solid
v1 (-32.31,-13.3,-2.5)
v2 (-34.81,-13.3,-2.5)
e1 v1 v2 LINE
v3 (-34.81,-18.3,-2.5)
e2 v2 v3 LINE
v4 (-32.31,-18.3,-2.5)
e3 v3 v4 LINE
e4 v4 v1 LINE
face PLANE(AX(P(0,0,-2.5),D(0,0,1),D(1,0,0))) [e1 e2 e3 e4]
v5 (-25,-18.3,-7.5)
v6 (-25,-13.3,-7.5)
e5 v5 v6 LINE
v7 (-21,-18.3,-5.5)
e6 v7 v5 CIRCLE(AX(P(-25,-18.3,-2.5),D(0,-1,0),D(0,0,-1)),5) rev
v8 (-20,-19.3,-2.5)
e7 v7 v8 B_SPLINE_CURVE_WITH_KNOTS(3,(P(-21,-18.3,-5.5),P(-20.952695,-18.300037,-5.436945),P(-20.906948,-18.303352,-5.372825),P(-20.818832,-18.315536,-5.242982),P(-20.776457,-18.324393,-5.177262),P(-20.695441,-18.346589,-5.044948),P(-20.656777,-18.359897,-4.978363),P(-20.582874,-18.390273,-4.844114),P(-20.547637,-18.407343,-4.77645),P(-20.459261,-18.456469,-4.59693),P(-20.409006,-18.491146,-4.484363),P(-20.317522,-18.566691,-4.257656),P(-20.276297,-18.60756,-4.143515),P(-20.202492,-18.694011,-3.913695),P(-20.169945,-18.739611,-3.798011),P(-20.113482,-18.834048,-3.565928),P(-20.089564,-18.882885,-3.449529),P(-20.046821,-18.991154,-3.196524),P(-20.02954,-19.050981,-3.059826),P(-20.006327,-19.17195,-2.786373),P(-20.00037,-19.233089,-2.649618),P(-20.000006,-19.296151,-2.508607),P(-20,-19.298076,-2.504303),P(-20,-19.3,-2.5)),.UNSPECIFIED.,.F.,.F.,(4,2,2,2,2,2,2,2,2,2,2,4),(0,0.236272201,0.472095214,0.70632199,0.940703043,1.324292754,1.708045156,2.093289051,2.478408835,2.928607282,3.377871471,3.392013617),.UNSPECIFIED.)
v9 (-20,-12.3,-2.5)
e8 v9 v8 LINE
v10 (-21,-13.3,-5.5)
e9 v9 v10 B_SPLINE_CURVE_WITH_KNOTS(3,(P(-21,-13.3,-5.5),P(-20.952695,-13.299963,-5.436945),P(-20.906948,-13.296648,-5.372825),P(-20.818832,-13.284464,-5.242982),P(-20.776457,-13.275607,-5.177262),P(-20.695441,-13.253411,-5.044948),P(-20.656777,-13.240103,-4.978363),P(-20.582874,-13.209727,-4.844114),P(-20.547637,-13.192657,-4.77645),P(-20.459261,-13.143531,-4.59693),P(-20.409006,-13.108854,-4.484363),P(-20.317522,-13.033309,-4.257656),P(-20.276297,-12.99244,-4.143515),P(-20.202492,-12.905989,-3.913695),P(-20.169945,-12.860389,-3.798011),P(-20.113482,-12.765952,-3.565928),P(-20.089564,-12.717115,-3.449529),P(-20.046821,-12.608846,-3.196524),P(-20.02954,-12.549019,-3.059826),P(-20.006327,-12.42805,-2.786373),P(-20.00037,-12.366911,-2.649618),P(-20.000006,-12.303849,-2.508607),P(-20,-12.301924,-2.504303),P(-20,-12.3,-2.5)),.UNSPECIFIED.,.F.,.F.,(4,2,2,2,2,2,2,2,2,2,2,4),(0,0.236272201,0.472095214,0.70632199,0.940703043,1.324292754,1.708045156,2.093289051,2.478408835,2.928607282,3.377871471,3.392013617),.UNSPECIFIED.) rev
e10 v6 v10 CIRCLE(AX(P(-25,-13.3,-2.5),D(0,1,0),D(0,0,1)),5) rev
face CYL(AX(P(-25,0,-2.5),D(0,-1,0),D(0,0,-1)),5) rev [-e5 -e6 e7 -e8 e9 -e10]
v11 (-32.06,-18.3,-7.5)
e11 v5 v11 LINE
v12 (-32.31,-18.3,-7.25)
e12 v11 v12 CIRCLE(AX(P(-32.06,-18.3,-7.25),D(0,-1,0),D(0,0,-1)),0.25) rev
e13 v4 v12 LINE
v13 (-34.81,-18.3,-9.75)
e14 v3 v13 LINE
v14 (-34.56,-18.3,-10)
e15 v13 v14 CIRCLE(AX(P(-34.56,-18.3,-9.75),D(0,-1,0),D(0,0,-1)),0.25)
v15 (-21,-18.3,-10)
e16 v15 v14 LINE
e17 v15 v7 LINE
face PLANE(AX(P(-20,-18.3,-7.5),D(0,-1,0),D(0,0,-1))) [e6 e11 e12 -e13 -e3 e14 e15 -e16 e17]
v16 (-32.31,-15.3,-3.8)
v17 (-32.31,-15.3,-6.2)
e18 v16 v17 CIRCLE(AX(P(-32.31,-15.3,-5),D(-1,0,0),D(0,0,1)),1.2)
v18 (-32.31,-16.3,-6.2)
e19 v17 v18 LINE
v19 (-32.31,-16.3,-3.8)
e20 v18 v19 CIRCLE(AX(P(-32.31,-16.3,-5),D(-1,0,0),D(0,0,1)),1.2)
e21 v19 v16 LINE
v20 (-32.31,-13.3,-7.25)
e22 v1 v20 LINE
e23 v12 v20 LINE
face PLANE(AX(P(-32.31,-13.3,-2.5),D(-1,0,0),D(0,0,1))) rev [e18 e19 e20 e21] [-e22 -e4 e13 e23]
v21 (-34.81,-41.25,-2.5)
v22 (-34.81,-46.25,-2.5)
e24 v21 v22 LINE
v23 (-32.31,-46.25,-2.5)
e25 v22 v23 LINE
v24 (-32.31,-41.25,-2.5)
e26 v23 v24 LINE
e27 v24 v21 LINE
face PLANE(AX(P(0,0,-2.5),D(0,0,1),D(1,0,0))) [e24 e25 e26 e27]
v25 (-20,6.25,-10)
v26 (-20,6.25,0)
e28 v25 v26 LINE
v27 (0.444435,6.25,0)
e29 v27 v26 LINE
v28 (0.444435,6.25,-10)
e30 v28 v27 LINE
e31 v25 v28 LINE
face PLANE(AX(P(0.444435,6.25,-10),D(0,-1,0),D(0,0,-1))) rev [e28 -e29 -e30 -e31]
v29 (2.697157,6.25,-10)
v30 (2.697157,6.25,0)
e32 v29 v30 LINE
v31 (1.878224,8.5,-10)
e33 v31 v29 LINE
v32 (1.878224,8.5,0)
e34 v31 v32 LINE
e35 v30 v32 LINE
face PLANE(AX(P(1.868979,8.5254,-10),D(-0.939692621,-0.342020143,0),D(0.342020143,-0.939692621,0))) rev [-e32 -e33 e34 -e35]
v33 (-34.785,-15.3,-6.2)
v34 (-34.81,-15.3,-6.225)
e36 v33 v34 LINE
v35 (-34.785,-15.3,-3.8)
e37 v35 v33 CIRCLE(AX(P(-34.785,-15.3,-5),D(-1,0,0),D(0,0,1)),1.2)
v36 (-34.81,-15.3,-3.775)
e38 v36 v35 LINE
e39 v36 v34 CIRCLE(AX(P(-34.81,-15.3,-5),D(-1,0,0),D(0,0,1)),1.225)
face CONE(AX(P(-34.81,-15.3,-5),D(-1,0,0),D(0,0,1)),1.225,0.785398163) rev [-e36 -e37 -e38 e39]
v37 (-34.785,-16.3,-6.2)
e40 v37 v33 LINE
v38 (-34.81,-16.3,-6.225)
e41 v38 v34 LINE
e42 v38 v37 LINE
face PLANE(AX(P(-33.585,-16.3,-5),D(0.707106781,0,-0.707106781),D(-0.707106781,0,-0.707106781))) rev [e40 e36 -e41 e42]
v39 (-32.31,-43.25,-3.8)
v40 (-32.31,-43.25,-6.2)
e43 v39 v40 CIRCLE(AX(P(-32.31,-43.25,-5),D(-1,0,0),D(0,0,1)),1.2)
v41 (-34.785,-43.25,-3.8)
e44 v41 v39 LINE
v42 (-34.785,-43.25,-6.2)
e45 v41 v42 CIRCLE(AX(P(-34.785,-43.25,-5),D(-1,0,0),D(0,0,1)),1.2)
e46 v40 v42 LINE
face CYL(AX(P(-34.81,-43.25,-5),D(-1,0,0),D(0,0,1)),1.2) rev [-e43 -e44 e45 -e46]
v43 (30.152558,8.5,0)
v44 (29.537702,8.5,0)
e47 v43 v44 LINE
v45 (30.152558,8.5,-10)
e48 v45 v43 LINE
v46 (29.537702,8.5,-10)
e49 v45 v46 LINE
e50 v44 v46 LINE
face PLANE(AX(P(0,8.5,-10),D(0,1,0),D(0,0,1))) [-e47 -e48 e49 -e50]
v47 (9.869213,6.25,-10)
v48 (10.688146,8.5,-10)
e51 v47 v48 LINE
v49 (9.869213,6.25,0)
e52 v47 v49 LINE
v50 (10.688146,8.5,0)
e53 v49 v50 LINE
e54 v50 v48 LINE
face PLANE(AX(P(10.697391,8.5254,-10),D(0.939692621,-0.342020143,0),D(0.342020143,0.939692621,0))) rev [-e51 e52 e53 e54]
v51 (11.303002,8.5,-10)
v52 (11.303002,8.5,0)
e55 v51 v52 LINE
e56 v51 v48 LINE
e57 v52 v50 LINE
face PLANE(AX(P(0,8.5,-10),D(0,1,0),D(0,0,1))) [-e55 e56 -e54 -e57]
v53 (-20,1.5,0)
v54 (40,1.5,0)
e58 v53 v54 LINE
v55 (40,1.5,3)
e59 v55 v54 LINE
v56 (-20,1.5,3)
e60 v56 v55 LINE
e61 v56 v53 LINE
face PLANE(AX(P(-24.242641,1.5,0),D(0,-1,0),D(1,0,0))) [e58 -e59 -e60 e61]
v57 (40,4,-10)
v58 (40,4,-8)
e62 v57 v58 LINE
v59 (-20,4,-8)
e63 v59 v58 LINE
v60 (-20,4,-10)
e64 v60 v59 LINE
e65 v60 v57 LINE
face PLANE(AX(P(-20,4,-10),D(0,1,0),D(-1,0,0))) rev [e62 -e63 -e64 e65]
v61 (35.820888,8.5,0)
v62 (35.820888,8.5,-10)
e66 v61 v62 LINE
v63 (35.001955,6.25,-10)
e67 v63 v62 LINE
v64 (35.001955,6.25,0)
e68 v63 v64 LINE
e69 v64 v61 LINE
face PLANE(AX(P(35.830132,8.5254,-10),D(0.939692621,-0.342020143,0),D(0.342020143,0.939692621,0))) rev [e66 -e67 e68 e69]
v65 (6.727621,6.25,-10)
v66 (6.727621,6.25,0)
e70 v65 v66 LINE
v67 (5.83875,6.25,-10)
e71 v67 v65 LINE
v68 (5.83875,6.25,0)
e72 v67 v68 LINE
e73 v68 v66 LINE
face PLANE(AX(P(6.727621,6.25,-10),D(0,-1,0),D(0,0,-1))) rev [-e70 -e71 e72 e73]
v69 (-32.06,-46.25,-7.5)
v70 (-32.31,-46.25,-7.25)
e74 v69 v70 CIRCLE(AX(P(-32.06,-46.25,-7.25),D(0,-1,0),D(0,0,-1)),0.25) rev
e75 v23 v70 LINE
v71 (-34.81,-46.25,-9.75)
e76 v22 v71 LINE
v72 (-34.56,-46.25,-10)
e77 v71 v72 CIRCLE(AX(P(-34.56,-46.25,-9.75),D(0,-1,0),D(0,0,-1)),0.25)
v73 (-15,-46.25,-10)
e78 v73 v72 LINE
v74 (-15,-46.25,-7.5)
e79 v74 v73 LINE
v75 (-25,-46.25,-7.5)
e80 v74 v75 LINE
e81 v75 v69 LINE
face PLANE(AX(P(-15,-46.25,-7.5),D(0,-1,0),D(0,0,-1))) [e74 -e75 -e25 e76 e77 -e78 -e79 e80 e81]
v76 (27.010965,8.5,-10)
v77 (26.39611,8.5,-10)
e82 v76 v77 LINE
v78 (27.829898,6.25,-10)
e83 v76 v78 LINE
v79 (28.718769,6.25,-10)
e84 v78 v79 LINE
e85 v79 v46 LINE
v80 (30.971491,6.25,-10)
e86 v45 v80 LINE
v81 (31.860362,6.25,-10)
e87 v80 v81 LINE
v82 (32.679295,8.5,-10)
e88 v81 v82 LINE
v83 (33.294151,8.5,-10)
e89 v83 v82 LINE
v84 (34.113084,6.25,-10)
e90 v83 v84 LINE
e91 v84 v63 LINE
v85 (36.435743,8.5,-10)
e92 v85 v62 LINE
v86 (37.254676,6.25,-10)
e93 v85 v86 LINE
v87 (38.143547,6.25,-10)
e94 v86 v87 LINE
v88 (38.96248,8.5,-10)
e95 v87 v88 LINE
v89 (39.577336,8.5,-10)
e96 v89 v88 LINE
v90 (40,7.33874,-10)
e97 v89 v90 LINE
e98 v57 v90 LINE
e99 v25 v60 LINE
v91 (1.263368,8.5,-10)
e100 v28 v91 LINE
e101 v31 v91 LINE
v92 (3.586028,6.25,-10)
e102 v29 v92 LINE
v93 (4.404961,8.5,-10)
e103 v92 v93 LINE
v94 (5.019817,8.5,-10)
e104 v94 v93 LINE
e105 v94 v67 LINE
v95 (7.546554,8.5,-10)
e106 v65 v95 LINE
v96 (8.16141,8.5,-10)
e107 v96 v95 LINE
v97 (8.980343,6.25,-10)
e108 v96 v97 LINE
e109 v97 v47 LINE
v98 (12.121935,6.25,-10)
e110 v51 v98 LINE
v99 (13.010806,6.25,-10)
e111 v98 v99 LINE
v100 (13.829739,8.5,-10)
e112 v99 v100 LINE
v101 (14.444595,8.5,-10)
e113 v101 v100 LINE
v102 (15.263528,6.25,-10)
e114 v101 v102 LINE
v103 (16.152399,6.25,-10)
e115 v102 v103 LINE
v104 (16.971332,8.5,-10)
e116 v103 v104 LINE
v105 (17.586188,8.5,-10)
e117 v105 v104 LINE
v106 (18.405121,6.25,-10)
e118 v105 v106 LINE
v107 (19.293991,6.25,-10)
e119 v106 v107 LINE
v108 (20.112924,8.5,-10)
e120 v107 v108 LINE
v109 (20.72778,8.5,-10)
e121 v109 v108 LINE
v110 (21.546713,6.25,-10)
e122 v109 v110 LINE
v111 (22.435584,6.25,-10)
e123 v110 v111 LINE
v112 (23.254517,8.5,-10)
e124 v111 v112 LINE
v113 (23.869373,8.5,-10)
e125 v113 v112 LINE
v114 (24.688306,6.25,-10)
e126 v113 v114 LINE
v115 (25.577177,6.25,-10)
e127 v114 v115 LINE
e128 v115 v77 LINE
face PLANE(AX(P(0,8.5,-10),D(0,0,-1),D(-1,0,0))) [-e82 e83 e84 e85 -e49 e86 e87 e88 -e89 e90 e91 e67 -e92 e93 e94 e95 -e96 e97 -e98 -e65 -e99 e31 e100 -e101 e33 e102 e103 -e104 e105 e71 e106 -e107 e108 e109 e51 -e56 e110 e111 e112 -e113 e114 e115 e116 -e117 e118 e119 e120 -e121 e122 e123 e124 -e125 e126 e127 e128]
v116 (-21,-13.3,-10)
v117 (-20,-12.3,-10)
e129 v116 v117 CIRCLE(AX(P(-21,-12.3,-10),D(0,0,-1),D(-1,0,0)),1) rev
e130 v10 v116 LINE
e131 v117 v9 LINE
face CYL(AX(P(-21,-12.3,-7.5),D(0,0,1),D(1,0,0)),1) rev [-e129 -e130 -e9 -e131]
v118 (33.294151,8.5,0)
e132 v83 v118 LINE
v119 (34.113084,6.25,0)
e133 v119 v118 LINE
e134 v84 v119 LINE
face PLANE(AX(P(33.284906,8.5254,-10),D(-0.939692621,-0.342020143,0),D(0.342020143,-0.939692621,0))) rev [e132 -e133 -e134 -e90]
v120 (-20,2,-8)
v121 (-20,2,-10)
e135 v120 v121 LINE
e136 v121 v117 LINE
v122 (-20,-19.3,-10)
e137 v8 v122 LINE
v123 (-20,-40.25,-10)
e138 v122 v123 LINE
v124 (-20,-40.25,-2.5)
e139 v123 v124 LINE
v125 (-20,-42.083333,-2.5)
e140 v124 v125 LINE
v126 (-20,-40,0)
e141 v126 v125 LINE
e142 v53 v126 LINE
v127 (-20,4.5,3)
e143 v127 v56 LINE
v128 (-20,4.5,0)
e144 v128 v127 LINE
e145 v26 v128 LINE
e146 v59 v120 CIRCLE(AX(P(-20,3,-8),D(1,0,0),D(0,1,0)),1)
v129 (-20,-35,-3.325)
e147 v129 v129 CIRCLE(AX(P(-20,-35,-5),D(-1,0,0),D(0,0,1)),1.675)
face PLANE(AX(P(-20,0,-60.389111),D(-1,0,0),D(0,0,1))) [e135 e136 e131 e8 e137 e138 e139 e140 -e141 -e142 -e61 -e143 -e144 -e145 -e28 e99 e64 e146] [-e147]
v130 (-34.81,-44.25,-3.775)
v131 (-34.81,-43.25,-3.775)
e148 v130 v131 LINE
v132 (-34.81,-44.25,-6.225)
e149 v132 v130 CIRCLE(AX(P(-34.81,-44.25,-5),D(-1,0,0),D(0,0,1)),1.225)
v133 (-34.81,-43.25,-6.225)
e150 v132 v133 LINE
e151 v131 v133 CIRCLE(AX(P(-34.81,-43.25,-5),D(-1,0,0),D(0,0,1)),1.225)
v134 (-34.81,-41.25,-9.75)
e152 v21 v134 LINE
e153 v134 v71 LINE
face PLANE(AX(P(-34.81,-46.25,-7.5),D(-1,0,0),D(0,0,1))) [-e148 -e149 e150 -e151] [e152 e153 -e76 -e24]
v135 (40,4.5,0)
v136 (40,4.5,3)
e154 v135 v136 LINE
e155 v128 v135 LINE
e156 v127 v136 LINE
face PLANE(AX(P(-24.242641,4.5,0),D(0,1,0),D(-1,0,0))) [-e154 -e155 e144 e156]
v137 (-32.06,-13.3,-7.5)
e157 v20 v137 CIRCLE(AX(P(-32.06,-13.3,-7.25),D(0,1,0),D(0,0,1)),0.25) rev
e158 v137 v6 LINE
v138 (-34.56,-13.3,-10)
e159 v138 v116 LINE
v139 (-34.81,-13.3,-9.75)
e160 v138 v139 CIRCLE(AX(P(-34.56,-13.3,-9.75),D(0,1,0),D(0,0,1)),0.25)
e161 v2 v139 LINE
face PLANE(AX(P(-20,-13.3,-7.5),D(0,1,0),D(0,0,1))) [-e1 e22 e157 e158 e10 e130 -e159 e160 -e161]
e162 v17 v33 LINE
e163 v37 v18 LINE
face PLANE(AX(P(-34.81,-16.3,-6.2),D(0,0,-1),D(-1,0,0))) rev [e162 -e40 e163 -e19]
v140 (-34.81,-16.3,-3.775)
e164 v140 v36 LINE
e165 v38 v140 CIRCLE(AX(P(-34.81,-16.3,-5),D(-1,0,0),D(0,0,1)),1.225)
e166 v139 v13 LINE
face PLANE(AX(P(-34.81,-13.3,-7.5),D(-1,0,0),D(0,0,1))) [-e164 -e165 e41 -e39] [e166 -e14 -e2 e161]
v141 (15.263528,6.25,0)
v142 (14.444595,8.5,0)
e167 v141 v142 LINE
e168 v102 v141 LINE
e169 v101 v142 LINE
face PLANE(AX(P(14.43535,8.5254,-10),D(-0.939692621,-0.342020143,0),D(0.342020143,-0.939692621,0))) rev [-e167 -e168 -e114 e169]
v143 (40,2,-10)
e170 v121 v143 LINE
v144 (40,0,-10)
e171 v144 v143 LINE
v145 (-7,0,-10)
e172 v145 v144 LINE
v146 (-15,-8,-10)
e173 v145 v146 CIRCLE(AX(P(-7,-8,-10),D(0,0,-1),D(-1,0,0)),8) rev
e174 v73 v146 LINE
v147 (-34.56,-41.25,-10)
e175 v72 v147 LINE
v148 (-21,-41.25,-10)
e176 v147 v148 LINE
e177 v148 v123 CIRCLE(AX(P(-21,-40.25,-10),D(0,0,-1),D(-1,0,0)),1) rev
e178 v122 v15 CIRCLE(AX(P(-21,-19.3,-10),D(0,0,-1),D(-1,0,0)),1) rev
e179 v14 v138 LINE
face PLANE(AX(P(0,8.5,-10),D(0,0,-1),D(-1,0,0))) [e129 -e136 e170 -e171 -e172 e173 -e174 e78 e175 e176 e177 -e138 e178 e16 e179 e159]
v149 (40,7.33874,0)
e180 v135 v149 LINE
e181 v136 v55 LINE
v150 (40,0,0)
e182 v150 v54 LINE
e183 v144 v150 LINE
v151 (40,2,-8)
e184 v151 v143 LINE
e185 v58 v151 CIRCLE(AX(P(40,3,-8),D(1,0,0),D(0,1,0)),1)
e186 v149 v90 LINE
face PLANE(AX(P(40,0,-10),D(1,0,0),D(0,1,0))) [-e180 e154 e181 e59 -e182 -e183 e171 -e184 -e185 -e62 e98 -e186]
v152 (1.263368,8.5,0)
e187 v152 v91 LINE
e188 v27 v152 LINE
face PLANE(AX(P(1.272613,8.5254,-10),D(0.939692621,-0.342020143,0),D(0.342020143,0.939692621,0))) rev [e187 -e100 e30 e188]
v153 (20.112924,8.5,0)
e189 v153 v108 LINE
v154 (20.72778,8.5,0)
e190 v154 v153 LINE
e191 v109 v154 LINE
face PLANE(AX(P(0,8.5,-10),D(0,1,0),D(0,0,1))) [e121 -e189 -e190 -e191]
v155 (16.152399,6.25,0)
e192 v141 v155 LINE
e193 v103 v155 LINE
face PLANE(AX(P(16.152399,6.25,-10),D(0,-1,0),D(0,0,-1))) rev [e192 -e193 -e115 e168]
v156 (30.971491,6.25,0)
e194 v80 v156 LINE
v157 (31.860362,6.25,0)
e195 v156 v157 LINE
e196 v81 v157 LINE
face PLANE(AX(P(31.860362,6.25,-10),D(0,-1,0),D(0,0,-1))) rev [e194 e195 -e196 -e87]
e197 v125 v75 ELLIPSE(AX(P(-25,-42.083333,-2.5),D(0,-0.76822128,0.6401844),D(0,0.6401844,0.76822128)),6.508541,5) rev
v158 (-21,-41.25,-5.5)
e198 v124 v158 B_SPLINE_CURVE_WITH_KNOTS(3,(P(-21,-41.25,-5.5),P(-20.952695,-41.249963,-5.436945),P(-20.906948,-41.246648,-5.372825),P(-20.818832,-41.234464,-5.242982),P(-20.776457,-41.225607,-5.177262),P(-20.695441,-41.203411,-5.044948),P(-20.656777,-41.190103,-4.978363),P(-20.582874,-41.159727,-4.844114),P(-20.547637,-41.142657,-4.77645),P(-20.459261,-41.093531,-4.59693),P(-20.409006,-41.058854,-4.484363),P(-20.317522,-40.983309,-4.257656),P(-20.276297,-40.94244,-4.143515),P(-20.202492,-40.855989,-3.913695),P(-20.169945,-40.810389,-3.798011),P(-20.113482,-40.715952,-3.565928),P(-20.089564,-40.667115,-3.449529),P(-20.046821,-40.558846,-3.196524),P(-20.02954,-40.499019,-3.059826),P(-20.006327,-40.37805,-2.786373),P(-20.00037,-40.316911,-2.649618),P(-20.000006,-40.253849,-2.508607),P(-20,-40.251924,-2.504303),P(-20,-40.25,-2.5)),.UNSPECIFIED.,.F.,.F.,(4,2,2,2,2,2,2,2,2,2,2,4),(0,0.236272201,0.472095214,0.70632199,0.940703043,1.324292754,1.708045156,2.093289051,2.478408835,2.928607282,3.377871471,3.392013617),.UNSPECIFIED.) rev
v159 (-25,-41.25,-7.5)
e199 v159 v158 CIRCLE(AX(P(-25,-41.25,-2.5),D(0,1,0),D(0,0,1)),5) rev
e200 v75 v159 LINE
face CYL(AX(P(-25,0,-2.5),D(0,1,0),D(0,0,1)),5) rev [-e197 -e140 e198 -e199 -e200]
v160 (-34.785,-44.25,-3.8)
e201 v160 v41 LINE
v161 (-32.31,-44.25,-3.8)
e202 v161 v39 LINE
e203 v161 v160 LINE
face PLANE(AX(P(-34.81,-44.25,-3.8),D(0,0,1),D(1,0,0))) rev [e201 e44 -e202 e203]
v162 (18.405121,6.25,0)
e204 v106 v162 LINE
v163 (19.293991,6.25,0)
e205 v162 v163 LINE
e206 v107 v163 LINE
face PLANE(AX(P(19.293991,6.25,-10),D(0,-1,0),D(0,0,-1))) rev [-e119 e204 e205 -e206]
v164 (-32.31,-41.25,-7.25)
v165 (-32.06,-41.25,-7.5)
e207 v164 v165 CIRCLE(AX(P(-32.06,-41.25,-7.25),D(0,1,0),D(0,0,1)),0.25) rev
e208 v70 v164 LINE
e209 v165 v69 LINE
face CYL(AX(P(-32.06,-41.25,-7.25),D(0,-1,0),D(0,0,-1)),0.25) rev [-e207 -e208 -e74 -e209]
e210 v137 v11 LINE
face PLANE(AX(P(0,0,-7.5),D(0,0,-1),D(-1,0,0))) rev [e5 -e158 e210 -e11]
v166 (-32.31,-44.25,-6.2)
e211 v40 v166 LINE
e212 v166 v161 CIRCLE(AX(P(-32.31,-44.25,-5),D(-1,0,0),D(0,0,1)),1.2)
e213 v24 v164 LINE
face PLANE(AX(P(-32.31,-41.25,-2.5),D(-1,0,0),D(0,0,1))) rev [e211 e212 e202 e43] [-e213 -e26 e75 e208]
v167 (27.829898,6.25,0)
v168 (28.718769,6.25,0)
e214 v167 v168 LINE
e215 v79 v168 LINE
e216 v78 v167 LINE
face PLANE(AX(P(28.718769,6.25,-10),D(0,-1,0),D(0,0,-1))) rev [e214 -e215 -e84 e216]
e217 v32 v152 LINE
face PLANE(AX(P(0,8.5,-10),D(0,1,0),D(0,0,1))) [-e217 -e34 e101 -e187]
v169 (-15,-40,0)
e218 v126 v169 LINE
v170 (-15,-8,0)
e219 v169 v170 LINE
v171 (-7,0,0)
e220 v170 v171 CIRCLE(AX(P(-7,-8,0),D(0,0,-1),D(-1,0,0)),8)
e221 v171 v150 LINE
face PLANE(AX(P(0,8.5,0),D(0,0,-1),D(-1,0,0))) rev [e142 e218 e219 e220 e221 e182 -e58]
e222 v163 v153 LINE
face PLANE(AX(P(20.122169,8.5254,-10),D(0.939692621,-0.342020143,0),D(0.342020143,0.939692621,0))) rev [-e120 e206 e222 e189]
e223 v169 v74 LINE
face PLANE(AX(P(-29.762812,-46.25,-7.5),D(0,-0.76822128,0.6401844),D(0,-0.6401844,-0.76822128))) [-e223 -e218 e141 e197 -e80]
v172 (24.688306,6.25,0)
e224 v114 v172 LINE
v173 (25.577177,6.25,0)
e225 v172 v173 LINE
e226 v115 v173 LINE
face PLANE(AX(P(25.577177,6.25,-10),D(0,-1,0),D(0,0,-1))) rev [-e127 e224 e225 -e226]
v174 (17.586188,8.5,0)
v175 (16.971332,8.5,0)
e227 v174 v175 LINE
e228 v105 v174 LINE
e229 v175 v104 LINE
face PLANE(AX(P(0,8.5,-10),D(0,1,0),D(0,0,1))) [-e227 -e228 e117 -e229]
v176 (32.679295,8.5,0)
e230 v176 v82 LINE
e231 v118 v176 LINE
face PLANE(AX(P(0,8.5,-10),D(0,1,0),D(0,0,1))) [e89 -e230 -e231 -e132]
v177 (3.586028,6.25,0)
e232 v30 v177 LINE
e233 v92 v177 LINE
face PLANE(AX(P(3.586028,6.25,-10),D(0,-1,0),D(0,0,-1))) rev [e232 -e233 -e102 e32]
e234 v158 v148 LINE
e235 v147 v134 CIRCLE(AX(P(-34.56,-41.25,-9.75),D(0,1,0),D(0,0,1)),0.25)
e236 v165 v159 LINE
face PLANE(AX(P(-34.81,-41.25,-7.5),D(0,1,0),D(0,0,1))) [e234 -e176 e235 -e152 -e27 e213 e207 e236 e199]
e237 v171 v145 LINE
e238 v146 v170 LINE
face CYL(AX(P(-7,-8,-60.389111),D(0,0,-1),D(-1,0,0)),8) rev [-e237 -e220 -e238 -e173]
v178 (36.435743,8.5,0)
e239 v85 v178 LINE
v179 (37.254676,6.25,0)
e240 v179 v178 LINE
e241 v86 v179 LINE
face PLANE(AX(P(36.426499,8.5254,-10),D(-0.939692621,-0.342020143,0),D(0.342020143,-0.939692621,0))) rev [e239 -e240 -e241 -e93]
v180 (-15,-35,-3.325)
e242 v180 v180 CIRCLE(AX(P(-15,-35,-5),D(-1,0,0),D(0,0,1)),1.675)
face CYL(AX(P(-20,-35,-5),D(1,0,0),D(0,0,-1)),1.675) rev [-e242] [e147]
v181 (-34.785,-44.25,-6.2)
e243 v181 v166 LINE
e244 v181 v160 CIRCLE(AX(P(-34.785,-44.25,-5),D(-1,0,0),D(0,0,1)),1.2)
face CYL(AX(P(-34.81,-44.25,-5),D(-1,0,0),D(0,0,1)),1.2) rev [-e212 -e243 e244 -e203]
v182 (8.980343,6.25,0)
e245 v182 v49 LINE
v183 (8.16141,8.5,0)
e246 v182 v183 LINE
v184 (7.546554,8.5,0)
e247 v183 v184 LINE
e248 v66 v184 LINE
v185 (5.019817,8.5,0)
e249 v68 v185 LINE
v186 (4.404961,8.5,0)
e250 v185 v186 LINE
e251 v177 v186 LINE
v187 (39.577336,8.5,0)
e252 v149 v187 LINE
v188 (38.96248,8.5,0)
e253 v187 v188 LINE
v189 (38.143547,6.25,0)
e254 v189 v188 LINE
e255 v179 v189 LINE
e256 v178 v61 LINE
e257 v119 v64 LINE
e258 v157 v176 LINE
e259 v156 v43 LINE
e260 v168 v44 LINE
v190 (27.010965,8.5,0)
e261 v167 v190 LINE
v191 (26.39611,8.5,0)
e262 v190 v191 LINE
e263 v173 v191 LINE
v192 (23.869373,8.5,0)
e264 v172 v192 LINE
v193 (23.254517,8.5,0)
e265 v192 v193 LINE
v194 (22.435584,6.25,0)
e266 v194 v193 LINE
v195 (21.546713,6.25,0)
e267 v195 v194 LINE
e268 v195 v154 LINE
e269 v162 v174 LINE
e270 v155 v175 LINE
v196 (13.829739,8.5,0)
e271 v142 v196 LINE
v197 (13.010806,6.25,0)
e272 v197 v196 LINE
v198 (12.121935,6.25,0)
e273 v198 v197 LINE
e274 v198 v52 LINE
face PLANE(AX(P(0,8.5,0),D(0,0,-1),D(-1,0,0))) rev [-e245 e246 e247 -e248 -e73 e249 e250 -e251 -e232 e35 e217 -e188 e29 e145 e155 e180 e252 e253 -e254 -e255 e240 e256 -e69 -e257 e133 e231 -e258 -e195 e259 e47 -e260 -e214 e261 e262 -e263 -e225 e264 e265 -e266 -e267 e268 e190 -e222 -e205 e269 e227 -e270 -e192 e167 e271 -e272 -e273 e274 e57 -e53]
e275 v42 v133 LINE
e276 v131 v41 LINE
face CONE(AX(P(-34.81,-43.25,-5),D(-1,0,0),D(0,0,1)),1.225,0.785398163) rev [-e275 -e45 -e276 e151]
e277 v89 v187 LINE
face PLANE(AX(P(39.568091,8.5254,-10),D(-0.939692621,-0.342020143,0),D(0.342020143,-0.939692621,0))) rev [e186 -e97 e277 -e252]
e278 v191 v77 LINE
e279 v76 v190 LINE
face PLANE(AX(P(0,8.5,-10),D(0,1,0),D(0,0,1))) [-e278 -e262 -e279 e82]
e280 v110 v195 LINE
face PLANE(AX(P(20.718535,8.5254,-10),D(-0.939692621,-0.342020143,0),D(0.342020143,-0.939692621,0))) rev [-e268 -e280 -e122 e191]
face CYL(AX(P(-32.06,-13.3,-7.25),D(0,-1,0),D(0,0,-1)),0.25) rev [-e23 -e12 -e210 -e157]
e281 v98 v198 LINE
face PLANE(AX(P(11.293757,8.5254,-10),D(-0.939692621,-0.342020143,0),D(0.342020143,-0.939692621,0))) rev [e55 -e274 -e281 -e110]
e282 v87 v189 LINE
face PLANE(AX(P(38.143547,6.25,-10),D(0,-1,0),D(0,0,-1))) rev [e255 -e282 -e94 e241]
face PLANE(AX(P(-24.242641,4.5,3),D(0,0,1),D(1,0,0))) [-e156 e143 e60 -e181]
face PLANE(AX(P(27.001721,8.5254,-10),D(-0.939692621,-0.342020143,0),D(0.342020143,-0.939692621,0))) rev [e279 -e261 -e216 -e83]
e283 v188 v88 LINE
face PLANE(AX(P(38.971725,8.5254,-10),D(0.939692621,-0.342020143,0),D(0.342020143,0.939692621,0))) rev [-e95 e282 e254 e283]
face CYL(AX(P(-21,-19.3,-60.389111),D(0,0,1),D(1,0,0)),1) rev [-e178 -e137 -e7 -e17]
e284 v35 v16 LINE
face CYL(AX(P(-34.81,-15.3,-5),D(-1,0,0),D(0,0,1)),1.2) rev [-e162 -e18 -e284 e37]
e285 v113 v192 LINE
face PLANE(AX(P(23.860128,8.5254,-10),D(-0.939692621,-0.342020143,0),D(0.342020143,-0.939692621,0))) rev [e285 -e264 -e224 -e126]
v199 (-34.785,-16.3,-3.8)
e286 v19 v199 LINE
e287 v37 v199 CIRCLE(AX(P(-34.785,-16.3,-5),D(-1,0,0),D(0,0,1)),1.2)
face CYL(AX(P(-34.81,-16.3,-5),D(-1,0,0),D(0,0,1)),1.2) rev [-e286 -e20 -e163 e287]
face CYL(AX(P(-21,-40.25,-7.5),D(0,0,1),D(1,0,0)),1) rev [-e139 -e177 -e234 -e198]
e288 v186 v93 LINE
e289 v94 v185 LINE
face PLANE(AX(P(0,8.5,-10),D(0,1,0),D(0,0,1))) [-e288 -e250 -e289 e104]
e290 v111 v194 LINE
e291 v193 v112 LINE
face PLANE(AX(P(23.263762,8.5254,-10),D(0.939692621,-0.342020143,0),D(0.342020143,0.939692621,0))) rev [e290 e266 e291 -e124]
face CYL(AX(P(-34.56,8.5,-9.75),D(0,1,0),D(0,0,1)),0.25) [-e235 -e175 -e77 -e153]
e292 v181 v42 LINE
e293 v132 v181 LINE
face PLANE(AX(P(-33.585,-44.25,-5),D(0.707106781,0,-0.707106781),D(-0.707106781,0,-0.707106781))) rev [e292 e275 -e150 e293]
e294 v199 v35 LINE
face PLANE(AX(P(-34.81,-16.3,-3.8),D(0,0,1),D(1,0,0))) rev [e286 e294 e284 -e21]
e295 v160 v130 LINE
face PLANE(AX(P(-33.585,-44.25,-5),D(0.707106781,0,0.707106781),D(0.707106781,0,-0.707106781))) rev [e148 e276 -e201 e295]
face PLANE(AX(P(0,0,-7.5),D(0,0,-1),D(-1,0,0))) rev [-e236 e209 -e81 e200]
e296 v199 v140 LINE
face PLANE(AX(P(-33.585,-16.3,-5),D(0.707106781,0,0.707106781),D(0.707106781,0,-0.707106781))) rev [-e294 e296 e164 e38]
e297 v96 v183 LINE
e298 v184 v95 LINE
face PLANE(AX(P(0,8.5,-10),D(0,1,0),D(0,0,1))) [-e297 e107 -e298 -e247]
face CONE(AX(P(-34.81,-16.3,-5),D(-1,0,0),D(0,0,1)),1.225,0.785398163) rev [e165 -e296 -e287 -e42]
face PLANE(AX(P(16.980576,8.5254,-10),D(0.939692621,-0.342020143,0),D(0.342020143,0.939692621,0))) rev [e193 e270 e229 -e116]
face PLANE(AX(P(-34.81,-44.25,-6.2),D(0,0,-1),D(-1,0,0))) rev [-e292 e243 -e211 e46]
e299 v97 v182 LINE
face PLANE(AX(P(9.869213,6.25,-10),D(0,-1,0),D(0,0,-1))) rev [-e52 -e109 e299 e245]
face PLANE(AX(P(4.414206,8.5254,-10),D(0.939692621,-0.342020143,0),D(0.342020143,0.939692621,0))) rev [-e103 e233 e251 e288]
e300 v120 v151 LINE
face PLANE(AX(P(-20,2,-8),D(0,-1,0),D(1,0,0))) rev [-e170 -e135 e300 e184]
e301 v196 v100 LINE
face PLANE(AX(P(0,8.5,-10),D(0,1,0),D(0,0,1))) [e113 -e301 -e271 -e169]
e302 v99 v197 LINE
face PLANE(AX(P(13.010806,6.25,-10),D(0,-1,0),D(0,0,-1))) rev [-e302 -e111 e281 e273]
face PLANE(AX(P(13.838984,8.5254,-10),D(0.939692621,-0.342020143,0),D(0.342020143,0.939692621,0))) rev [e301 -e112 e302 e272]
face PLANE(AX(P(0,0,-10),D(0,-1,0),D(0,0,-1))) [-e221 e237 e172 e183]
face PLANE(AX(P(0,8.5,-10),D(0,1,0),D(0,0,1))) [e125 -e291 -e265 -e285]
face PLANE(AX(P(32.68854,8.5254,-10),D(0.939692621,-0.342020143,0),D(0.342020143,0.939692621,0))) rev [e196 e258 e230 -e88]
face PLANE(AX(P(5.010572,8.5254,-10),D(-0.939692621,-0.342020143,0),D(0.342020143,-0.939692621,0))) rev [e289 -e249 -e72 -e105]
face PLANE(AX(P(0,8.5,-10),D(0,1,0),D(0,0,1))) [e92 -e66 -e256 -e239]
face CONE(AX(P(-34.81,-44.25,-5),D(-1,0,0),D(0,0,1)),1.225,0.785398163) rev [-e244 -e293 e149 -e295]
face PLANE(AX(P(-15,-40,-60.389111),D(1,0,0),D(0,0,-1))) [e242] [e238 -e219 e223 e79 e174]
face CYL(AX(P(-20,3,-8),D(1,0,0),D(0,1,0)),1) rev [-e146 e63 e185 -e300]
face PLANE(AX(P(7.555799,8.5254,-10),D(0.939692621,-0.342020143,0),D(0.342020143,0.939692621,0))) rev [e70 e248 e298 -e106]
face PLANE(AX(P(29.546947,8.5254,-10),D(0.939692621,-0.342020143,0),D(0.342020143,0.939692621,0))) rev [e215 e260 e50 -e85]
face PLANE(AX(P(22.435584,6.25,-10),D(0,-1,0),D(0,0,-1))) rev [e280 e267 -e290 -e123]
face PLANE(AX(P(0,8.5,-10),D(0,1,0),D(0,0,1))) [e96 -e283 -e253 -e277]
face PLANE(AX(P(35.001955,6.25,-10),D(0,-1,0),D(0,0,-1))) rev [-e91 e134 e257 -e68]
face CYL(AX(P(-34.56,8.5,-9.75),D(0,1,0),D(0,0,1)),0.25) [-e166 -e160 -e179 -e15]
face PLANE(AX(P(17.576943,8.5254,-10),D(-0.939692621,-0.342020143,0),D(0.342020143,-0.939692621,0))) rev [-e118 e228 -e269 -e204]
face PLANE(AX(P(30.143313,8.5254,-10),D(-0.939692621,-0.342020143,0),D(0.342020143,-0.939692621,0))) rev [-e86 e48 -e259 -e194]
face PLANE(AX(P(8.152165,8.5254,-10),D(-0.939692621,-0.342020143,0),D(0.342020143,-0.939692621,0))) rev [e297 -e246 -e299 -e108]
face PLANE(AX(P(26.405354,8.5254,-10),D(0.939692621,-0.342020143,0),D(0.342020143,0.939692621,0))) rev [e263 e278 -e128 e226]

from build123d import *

# Parameters (mm, degrees)
BLANKSKE_W               = 40
BLANKSKE_H               = 8.5
BLANK_DEPTH              = 10
TOOTHCUTSIM_DEPTH        = 43.09809972
TEETHCUTS_COUNT          = 14
TEETHCUTS_PITCH          = 3.14159265
BOSS_EXTRUDE1_DEPTH      = 10
SKETCH2_W                = 3
SKETCH2_H                = 3
BOSS_EXTRUDE2_DEPTH      = 60
CUT_EXTRUDE2_DEPTH       = 73.801098893
MOVE_FACE2_BY            = 5
FILLET2_R                = 8
SKETCH3_R                = 1.675
CUT_EXTRUDE1_DEPTH       = 69.738635424
SKETCH6_W                = 14.81
SKETCH6_H                = 5
BOSS_EXTRUDE3_DEPTH      = 2.5
SKETCH7_W                = 2.5
SKETCH7_H                = 5
BOSS_EXTRUDE4_DEPTH      = 5
M2_START                 = -34.81
M2_CLEARANCE_SLOT1_DEPTH = 2.5
BOSS_EXTRUDE5_DEPTH      = 5
FILLET3_R                = 5
FILLET4_R                = 1
FILLET5_R                = 0.25


with BuildPart() as part:
    # BlankSke → Blank (new body)
    with BuildSketch(Plane.XY):
        with Locations((20, 4.25)):
            Rectangle(BLANKSKE_W, BLANKSKE_H)
    extrude(amount=-BLANK_DEPTH)

    # TooCutSkeSim → ToothCutSim (cut, through all)
    with BuildSketch(Plane.XY):
        Polygon((0.44443537, 6.25), (-0.44443537, 6.25), (-1.272613241, 8.5254), (1.272613241, 8.5254), align=None)
    toothcutsim = extrude(amount=-TOOTHCUTSIM_DEPTH, mode=Mode.SUBTRACT)

    # TeethCuts: ToothCutSim ×14
    with Locations(*[(i * TEETHCUTS_PITCH, 0, 0) for i in range(1, TEETHCUTS_COUNT)]):
        add(toothcutsim, mode=Mode.SUBTRACT)

    # Sketch1 → Boss-Extrude1 (add)
    with BuildSketch(Plane.XY):
        Polygon((-20, 0), (-20, -40), (-10, -40), (-10, 0), (0, 0), (0, 6.25), (-20, 6.25), align=None)
    extrude(amount=-BOSS_EXTRUDE1_DEPTH)

    # Sketch2 → Boss-Extrude2 (add)
    with BuildSketch(Plane(origin=(40, 0, 0), x_dir=(0, 0, -1), z_dir=(1, 0, 0))):
        with Locations((-1.5, 3)):
            Rectangle(SKETCH2_W, SKETCH2_H)
    extrude(amount=-BOSS_EXTRUDE2_DEPTH)

    # Sketch5 → Cut-Extrude2 (cut, through all)
    with BuildSketch(Plane(origin=(40, 0, 0), x_dir=(0, 0, -1), z_dir=(1, 0, 0))):
        with BuildLine():
            Line((10, 2), (10, 4))
            Line((10, 4), (8, 4))
            ThreePointArc((8, 4), (7, 3), (8, 2))
            Line((8, 2), (10, 2))
        make_face()
    extrude(amount=-CUT_EXTRUDE2_DEPTH, mode=Mode.SUBTRACT)

    # Move Face2: a face moved inward by 5.0
    extrude(part.faces().sort_by_distance((-10, -20, -5))[0], amount=MOVE_FACE2_BY, dir=(-1, 0, 0), mode=Mode.SUBTRACT)

    # Fillet2
    fillet2_edges = [part.edges().sort_by_distance(p)[0] for p in [
        (-15, 0, -5),
    ]]
    fillet(fillet2_edges, radius=FILLET2_R)

    # Sketch3 → Cut-Extrude1 (cut, through all)
    with BuildSketch(Plane.ZY.offset(15)):
        with Locations((-5, -35)):
            Circle(SKETCH3_R)
    extrude(amount=CUT_EXTRUDE1_DEPTH, mode=Mode.SUBTRACT)

    # Sketch6 → Boss-Extrude3 (add)
    with BuildSketch(Plane(origin=(0, 0, -10), x_dir=(-1, 0, 0), z_dir=(0, 0, -1))):
        with Locations((27.405, -15.8)):
            Rectangle(SKETCH6_W, SKETCH6_H)
        Polygon((20, -40), (15, -40), (15, -46.25), (34.81, -46.25), (34.81, -41.25), (20, -41.25), align=None)
    extrude(amount=-BOSS_EXTRUDE3_DEPTH)

    # Sketch7 → Boss-Extrude4 (add)
    with BuildSketch(Plane.XY.offset(-7.5)):
        with Locations((-33.56, -15.8)):
            Rectangle(SKETCH7_W, SKETCH7_H)
        with Locations((-33.56, -43.75)):
            Rectangle(SKETCH7_W, SKETCH7_H)
    extrude(amount=BOSS_EXTRUDE4_DEPTH)

    # M2 Clearance Slot1: read off the stored shape, not the designer's step
    # M2 Clearance Slot1 outline → M2 Clearance Slot1 (cut)
    with BuildSketch(Plane.YZ.offset(M2_START)):
        with BuildLine():
            ThreePointArc((-44.25, -3.8), (-45.45, -5), (-44.25, -6.2))
            Line((-44.25, -6.2), (-43.25, -6.2))
            ThreePointArc((-43.25, -6.2), (-42.05, -5), (-43.25, -3.8))
            Line((-43.25, -3.8), (-44.25, -3.8))
        make_face()
        with BuildLine():
            ThreePointArc((-16.3, -3.8), (-17.5, -5), (-16.3, -6.2))
            Line((-16.3, -6.2), (-15.3, -6.2))
            ThreePointArc((-15.3, -6.2), (-14.1, -5), (-15.3, -3.8))
            Line((-15.3, -3.8), (-16.3, -3.8))
        make_face()
    extrude(amount=M2_CLEARANCE_SLOT1_DEPTH, mode=Mode.SUBTRACT)

    # M2 Clearance Slot1 2: loft between two sections, ruled curve by curve
    m2_clearance_slot1_2_from = [
        Edge.make_three_point_arc((-34.785, -43.25, -3.8), (-34.785, -42.401471863, -4.151471863), (-34.785, -42.05, -5)),
        Edge.make_three_point_arc((-34.785, -42.05, -5), (-34.785, -42.401471863, -5.848528137), (-34.785, -43.25, -6.2)),
        Edge.make_three_point_arc((-34.785, -44.25, -6.2), (-34.785, -45.098528137, -5.848528137), (-34.785, -45.45, -5)),
        Edge.make_three_point_arc((-34.785, -45.45, -5), (-34.785, -45.098528137, -4.151471863), (-34.785, -44.25, -3.8)),
        Edge.make_line((-34.785, -43.25, -6.2), (-34.785, -44.25, -6.2)),
        Edge.make_line((-34.785, -43.25, -3.8), (-34.785, -44.25, -3.8)),
    ]
    m2_clearance_slot1_2_to = [
        Edge.make_three_point_arc((-34.81, -43.25, -3.775), (-34.81, -42.383794193, -4.133794193), (-34.81, -42.025, -5)),
        Edge.make_three_point_arc((-34.81, -42.025, -5), (-34.81, -42.383794193, -5.866205807), (-34.81, -43.25, -6.225)),
        Edge.make_three_point_arc((-34.81, -44.25, -6.225), (-34.81, -45.116205807, -5.866205807), (-34.81, -45.475, -5)),
        Edge.make_three_point_arc((-34.81, -45.475, -5), (-34.81, -45.116205807, -4.133794193), (-34.81, -44.25, -3.775)),
        Edge.make_line((-34.81, -43.25, -6.225), (-34.81, -44.25, -6.225)),
        Edge.make_line((-34.81, -43.25, -3.775), (-34.81, -44.25, -3.775)),
    ]
    m2_clearance_slot1_2 = Solid(Shell([*[Face.make_surface_from_curves(m2_clearance_slot1_2_from[k], m2_clearance_slot1_2_to[k]) for k in range(6)], Face(Wire(m2_clearance_slot1_2_from)), Face(Wire(m2_clearance_slot1_2_to))]))
    add(m2_clearance_slot1_2, mode=Mode.SUBTRACT)

    # M2 Clearance Slot1 3: loft between two sections, ruled curve by curve
    m2_clearance_slot1_3_from = [
        Edge.make_three_point_arc((-34.785, -15.3, -3.8), (-34.785, -14.451471863, -4.151471863), (-34.785, -14.1, -5)),
        Edge.make_three_point_arc((-34.785, -14.1, -5), (-34.785, -14.451471863, -5.848528137), (-34.785, -15.3, -6.2)),
        Edge.make_three_point_arc((-34.785, -16.3, -6.2), (-34.785, -17.148528137, -5.848528137), (-34.785, -17.5, -5)),
        Edge.make_three_point_arc((-34.785, -17.5, -5), (-34.785, -17.148528137, -4.151471863), (-34.785, -16.3, -3.8)),
        Edge.make_line((-34.785, -15.3, -6.2), (-34.785, -16.3, -6.2)),
        Edge.make_line((-34.785, -15.3, -3.8), (-34.785, -16.3, -3.8)),
    ]
    m2_clearance_slot1_3_to = [
        Edge.make_three_point_arc((-34.81, -15.3, -3.775), (-34.81, -14.433794193, -4.133794193), (-34.81, -14.075, -5)),
        Edge.make_three_point_arc((-34.81, -14.075, -5), (-34.81, -14.433794193, -5.866205807), (-34.81, -15.3, -6.225)),
        Edge.make_three_point_arc((-34.81, -16.3, -6.225), (-34.81, -17.166205807, -5.866205807), (-34.81, -17.525, -5)),
        Edge.make_three_point_arc((-34.81, -17.525, -5), (-34.81, -17.166205807, -4.133794193), (-34.81, -16.3, -3.775)),
        Edge.make_line((-34.81, -15.3, -6.225), (-34.81, -16.3, -6.225)),
        Edge.make_line((-34.81, -15.3, -3.775), (-34.81, -16.3, -3.775)),
    ]
    m2_clearance_slot1_3 = Solid(Shell([*[Face.make_surface_from_curves(m2_clearance_slot1_3_from[k], m2_clearance_slot1_3_to[k]) for k in range(6)], Face(Wire(m2_clearance_slot1_3_from)), Face(Wire(m2_clearance_slot1_3_to))]))
    add(m2_clearance_slot1_3, mode=Mode.SUBTRACT)

    # Sketch10 → Boss-Extrude5 (add)
    with BuildSketch(Plane(origin=(-15, 0, 0), x_dir=(0, 0, -1), z_dir=(1, 0, 0))):
        Polygon((7.5, -46.25), (0, -40), (7.5, -40), align=None)
    extrude(amount=-BOSS_EXTRUDE5_DEPTH)

    # Fillet3
    fillet3_edges = [part.edges().sort_by_distance(p)[0] for p in [
        (-20, -15.8, -7.5),
        (-20, -43.75, -7.5),
    ]]
    fillet(fillet3_edges, radius=FILLET3_R)

    # Fillet4
    fillet4_edges = [part.edges().sort_by_distance(p)[0] for p in [
        (-20, -18.3, -6.25),
        (-20, -13.3, -6.25),
        (-20, -41.25, -6.25),
    ]]
    fillet(fillet4_edges, radius=FILLET4_R)

    # Fillet5
    fillet5_edges = [part.edges().sort_by_distance(p)[0] for p in [
        (-34.81, -15.8, -10),
        (-34.81, -43.75, -10),
        (-32.31, -15.8, -7.5),
        (-32.31, -43.75, -7.5),
    ]]
    fillet(fillet5_edges, radius=FILLET5_R)


solid = part.part
